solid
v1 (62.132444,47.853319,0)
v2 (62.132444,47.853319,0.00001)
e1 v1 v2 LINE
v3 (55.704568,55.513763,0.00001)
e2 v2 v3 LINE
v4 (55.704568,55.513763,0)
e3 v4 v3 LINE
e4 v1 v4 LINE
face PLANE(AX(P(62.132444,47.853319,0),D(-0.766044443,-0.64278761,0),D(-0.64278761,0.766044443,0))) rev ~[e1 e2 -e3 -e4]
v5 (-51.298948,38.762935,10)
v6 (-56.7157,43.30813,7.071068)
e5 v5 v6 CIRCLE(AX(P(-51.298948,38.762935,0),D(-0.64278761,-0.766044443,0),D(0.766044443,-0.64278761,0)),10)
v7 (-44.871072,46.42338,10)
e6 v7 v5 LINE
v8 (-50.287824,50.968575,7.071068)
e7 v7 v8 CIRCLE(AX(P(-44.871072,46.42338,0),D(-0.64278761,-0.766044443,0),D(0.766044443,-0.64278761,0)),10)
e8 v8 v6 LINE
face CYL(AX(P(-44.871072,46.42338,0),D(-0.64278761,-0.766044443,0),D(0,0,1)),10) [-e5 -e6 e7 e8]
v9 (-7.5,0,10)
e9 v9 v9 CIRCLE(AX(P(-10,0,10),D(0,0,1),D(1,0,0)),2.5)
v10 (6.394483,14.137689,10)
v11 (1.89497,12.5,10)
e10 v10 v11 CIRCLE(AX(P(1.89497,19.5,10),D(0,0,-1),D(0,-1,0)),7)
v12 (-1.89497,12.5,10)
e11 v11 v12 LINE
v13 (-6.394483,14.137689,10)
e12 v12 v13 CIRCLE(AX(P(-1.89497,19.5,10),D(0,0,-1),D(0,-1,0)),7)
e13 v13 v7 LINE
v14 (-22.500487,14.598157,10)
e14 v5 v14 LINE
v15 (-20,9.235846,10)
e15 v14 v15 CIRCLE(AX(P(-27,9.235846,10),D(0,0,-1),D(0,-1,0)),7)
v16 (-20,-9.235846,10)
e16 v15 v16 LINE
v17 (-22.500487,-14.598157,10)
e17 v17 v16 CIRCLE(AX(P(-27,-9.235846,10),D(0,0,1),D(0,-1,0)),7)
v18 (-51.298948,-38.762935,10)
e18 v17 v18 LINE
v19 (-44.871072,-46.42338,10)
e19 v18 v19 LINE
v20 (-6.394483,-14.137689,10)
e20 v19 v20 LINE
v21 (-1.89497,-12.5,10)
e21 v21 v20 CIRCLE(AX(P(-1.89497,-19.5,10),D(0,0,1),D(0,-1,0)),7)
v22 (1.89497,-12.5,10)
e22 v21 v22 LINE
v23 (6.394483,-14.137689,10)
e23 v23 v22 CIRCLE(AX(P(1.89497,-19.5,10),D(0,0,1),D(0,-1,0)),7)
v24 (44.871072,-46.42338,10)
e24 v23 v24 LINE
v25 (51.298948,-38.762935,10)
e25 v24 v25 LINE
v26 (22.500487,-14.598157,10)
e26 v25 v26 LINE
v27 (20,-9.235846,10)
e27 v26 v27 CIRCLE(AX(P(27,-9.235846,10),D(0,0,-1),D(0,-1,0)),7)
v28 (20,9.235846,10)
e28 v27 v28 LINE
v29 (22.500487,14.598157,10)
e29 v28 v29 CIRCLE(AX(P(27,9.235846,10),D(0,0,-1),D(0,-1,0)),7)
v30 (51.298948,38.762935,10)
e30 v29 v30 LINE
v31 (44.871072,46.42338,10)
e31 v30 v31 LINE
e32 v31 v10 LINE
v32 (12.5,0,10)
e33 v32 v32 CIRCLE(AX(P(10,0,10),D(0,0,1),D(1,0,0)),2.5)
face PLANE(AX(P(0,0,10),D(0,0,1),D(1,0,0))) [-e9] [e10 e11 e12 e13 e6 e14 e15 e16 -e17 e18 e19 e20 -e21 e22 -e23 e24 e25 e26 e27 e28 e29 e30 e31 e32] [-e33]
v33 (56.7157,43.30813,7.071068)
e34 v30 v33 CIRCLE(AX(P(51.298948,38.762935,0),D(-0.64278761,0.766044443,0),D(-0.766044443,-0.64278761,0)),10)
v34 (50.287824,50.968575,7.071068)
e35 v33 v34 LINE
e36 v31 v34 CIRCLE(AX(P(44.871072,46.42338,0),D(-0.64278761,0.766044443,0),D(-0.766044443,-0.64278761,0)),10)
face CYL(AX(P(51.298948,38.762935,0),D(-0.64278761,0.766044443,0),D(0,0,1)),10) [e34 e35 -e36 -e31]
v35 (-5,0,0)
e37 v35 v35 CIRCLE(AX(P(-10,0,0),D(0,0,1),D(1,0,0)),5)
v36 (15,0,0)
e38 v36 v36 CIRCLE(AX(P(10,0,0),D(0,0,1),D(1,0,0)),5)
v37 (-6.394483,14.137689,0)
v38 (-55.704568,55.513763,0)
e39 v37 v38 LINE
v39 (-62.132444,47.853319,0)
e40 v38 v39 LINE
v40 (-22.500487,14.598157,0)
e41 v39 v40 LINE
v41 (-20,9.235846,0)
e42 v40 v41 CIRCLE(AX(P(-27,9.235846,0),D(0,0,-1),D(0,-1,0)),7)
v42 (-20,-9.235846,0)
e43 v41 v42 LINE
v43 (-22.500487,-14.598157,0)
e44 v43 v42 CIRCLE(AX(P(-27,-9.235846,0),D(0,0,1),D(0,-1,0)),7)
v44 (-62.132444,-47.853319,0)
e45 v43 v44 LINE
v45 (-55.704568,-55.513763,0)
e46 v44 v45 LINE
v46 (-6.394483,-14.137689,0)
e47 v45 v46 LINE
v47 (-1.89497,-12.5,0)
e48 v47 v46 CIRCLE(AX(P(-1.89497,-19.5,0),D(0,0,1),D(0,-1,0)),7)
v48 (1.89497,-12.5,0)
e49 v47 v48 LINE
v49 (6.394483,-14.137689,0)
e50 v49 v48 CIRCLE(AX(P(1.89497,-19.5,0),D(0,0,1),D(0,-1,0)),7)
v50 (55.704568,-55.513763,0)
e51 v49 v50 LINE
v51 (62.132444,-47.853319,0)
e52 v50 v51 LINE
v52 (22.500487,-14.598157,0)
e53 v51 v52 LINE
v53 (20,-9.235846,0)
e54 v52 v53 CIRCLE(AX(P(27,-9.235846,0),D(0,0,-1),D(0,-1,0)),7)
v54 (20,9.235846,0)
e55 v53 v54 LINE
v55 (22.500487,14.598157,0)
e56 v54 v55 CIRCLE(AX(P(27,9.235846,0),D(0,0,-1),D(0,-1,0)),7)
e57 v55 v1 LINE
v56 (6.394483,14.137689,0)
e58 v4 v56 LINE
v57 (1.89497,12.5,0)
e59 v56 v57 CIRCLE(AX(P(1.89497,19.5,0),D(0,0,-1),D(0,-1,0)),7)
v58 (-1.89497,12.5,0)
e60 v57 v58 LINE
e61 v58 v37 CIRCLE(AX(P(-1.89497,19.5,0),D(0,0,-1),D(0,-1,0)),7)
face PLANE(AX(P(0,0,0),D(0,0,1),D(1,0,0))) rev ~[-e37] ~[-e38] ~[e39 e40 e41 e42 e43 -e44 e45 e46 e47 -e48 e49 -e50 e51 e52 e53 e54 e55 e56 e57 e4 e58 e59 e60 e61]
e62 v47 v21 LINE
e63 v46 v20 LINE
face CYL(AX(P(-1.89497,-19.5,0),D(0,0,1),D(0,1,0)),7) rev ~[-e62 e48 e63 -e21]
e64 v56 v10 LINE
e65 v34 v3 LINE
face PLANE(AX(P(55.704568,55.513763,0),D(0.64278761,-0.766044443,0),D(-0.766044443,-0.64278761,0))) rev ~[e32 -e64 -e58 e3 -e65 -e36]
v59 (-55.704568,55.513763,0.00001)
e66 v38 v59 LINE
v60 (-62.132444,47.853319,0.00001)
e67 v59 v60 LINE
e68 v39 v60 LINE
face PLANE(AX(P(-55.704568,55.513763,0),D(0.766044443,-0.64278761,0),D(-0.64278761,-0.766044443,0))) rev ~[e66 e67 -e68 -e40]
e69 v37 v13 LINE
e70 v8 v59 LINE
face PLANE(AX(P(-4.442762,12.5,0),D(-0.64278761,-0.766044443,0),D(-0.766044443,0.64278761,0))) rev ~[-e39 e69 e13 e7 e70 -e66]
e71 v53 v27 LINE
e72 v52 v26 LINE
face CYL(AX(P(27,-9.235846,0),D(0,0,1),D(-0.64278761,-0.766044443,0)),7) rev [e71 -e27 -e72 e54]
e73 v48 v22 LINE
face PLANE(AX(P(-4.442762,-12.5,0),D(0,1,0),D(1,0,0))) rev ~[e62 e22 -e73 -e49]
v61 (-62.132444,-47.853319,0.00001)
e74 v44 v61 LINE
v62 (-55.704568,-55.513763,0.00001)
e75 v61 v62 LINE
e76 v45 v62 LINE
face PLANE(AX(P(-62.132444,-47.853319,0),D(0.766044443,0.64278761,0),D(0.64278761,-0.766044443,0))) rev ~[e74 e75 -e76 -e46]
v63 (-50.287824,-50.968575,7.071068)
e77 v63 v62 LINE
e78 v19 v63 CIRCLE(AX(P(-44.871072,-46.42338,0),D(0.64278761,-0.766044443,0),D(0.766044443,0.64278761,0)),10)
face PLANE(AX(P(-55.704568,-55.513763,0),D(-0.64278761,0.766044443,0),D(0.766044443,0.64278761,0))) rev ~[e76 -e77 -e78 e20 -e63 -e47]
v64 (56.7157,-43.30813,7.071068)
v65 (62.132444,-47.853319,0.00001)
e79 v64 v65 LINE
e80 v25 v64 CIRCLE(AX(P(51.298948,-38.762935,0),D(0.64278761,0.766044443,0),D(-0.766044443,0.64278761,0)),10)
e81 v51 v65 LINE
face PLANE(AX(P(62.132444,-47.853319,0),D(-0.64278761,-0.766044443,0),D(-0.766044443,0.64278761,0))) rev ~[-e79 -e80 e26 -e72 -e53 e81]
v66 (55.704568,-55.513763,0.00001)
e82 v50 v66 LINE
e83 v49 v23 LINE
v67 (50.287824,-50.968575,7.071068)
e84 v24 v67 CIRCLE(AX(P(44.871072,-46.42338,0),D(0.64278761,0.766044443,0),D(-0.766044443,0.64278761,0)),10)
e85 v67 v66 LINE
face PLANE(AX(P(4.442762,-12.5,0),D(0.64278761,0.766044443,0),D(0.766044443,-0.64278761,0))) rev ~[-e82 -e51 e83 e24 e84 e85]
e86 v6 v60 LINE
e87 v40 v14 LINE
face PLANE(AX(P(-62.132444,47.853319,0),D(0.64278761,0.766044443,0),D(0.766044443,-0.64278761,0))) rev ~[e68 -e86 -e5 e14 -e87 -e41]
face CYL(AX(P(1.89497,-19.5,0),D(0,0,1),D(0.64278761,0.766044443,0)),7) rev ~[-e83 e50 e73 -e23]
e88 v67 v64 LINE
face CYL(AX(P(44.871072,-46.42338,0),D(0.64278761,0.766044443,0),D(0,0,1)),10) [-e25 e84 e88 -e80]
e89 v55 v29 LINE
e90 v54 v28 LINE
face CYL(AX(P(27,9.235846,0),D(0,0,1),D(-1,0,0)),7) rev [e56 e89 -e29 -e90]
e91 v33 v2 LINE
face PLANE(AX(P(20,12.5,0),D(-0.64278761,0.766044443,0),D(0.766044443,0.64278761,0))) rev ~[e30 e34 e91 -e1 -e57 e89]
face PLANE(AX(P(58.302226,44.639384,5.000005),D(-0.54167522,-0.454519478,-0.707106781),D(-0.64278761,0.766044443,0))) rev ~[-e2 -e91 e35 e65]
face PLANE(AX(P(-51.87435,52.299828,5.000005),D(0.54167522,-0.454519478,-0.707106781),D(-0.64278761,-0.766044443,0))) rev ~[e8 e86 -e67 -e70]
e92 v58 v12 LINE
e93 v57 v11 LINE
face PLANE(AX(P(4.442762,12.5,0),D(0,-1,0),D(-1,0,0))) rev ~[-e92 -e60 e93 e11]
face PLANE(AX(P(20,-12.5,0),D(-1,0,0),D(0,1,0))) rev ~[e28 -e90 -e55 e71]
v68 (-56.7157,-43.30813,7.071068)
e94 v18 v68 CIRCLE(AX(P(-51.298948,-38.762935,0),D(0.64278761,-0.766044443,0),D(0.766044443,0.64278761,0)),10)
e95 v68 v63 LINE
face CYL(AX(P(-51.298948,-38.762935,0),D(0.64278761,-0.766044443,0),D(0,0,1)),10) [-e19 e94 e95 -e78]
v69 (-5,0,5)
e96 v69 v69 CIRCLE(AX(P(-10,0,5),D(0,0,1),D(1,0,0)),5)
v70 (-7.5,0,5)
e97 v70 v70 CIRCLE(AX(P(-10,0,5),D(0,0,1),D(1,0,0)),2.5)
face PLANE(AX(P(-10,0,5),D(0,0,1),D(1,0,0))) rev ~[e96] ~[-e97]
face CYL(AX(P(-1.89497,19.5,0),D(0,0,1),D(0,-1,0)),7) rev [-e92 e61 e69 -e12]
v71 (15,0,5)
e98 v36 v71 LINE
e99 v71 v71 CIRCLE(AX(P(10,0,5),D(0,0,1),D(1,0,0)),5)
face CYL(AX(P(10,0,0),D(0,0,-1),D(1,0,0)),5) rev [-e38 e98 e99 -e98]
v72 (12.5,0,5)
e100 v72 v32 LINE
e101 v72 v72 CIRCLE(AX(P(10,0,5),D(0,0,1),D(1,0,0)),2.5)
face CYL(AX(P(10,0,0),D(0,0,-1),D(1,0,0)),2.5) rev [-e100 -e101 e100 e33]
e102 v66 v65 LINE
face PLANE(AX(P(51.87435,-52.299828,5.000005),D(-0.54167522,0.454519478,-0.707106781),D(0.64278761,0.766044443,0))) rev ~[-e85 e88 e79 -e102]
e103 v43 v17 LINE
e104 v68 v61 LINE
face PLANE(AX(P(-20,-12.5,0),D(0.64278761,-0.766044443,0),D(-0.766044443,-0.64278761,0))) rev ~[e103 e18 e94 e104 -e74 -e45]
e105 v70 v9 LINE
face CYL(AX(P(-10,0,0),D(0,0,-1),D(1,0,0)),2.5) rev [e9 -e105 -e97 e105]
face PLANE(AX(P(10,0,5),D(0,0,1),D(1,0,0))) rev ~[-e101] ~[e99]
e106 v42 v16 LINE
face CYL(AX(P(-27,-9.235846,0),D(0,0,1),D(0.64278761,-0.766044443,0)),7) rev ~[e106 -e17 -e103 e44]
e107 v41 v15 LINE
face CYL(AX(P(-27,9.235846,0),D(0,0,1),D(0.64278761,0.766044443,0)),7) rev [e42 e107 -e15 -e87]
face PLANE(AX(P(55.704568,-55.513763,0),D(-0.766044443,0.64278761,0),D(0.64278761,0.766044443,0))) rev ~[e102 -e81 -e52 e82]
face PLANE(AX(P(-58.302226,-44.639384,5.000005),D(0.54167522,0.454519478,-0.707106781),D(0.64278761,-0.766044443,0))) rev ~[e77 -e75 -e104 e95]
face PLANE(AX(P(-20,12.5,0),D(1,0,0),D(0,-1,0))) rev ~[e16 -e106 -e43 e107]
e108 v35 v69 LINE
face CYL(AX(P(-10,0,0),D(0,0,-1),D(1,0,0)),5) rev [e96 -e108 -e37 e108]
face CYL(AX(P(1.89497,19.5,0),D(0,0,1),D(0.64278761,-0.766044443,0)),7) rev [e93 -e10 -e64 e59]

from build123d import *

# Parameters (mm, degrees)
F0_R     = 5
F0_R_2   = 2.5
F1_DEPTH = 10
F2_DEPTH = 5
F3_SIZE  = 9.99999
F4_R     = 7
F5_R     = 10


# Not quite as in the source:
# - a fillet or chamfer is up to 0.001 mm smaller than in the source, because OpenCascade refuses the exact size


with BuildPart() as f1:
    # F0 (on Top) → F1 (new body)
    with BuildSketch(Plane.XY):
        Polygon((4.4427617314, -12.5), (20, -12.5), (20, 12.5), (4.4427617314, 12.5), (-4.4427617314, 12.5), (-20, 12.5), (-20, -12.5), (-4.4427617314, -12.5), align=None)
        with Locations((-10, 0)):
            Circle(F0_R, mode=Mode.SUBTRACT)
        with Locations((10, 0)):
            Circle(F0_R, mode=Mode.SUBTRACT)
        Polygon((-55.7045682747, -55.5137629639), (-4.4427617314, -12.5), (-20, -12.5), (-62.1324443715, -47.8533185328), align=None)
        Polygon((62.1324443715, -47.8533185328), (20, -12.5), (4.4427617314, -12.5), (55.7045682747, -55.5137629639), align=None)
        Polygon((4.4427617314, 12.5), (20, 12.5), (62.1324443715, 47.8533185328), (55.7045682747, 55.5137629639), align=None)
        Polygon((-20, 12.5), (-4.4427617314, 12.5), (-55.7045682747, 55.5137629639), (-62.1324443715, 47.8533185328), align=None)
        with Locations((10, 0)):
            Circle(F0_R)
        with Locations((10, 0)):
            Circle(F0_R_2, mode=Mode.SUBTRACT)
        with Locations((-10, 0)):
            Circle(F0_R)
        with Locations((-10, 0)):
            Circle(F0_R_2, mode=Mode.SUBTRACT)
    extrude(amount=F1_DEPTH)

    # F0 (on Top) → F2 (cut)
    with BuildSketch(Plane.XY):
        with Locations((-10, 0)):
            Circle(F0_R)
        with Locations((-10, 0)):
            Circle(F0_R_2, mode=Mode.SUBTRACT)
        with Locations((10, 0)):
            Circle(F0_R)
        with Locations((10, 0)):
            Circle(F0_R_2, mode=Mode.SUBTRACT)
    extrude(amount=F2_DEPTH, mode=Mode.SUBTRACT)

    # F3 (size 10 in the source; OpenCascade refuses exactly that, so slightly less here)
    f3_edges = [f1.edges().sort_by_distance(p)[0] for p in [
        (58.918506, -51.683541, 10),
        (58.918506, 51.683541, 10),
        (-58.918506, 51.683541, 10),
        (-58.918506, -51.683541, 10),
    ]]
    chamfer(f3_edges, length=F3_SIZE)

    # F4
    f4_edges = [f1.edges().sort_by_distance(p)[0] for p in [
        (4.442762, 12.5, 5),
        (-4.442762, 12.5, 5),
        (4.442762, -12.5, 5),
        (-4.442762, -12.5, 5),
        (-20, -12.5, 5),
        (-20, 12.5, 5),
        (20, -12.5, 5),
        (20, 12.5, 5),
    ]]
    fillet(f4_edges, radius=F4_R)

    # F5
    f5_edges = [f1.edges().sort_by_distance(p)[0] for p in [
        (-51.25807, 45.255671, 10),
        (-51.25807, -45.255671, 10),
        (51.25807, 45.255671, 10),
        (51.25807, -45.255671, 10),
    ]]
    fillet(f5_edges, radius=F5_R)


solid = f1.part
